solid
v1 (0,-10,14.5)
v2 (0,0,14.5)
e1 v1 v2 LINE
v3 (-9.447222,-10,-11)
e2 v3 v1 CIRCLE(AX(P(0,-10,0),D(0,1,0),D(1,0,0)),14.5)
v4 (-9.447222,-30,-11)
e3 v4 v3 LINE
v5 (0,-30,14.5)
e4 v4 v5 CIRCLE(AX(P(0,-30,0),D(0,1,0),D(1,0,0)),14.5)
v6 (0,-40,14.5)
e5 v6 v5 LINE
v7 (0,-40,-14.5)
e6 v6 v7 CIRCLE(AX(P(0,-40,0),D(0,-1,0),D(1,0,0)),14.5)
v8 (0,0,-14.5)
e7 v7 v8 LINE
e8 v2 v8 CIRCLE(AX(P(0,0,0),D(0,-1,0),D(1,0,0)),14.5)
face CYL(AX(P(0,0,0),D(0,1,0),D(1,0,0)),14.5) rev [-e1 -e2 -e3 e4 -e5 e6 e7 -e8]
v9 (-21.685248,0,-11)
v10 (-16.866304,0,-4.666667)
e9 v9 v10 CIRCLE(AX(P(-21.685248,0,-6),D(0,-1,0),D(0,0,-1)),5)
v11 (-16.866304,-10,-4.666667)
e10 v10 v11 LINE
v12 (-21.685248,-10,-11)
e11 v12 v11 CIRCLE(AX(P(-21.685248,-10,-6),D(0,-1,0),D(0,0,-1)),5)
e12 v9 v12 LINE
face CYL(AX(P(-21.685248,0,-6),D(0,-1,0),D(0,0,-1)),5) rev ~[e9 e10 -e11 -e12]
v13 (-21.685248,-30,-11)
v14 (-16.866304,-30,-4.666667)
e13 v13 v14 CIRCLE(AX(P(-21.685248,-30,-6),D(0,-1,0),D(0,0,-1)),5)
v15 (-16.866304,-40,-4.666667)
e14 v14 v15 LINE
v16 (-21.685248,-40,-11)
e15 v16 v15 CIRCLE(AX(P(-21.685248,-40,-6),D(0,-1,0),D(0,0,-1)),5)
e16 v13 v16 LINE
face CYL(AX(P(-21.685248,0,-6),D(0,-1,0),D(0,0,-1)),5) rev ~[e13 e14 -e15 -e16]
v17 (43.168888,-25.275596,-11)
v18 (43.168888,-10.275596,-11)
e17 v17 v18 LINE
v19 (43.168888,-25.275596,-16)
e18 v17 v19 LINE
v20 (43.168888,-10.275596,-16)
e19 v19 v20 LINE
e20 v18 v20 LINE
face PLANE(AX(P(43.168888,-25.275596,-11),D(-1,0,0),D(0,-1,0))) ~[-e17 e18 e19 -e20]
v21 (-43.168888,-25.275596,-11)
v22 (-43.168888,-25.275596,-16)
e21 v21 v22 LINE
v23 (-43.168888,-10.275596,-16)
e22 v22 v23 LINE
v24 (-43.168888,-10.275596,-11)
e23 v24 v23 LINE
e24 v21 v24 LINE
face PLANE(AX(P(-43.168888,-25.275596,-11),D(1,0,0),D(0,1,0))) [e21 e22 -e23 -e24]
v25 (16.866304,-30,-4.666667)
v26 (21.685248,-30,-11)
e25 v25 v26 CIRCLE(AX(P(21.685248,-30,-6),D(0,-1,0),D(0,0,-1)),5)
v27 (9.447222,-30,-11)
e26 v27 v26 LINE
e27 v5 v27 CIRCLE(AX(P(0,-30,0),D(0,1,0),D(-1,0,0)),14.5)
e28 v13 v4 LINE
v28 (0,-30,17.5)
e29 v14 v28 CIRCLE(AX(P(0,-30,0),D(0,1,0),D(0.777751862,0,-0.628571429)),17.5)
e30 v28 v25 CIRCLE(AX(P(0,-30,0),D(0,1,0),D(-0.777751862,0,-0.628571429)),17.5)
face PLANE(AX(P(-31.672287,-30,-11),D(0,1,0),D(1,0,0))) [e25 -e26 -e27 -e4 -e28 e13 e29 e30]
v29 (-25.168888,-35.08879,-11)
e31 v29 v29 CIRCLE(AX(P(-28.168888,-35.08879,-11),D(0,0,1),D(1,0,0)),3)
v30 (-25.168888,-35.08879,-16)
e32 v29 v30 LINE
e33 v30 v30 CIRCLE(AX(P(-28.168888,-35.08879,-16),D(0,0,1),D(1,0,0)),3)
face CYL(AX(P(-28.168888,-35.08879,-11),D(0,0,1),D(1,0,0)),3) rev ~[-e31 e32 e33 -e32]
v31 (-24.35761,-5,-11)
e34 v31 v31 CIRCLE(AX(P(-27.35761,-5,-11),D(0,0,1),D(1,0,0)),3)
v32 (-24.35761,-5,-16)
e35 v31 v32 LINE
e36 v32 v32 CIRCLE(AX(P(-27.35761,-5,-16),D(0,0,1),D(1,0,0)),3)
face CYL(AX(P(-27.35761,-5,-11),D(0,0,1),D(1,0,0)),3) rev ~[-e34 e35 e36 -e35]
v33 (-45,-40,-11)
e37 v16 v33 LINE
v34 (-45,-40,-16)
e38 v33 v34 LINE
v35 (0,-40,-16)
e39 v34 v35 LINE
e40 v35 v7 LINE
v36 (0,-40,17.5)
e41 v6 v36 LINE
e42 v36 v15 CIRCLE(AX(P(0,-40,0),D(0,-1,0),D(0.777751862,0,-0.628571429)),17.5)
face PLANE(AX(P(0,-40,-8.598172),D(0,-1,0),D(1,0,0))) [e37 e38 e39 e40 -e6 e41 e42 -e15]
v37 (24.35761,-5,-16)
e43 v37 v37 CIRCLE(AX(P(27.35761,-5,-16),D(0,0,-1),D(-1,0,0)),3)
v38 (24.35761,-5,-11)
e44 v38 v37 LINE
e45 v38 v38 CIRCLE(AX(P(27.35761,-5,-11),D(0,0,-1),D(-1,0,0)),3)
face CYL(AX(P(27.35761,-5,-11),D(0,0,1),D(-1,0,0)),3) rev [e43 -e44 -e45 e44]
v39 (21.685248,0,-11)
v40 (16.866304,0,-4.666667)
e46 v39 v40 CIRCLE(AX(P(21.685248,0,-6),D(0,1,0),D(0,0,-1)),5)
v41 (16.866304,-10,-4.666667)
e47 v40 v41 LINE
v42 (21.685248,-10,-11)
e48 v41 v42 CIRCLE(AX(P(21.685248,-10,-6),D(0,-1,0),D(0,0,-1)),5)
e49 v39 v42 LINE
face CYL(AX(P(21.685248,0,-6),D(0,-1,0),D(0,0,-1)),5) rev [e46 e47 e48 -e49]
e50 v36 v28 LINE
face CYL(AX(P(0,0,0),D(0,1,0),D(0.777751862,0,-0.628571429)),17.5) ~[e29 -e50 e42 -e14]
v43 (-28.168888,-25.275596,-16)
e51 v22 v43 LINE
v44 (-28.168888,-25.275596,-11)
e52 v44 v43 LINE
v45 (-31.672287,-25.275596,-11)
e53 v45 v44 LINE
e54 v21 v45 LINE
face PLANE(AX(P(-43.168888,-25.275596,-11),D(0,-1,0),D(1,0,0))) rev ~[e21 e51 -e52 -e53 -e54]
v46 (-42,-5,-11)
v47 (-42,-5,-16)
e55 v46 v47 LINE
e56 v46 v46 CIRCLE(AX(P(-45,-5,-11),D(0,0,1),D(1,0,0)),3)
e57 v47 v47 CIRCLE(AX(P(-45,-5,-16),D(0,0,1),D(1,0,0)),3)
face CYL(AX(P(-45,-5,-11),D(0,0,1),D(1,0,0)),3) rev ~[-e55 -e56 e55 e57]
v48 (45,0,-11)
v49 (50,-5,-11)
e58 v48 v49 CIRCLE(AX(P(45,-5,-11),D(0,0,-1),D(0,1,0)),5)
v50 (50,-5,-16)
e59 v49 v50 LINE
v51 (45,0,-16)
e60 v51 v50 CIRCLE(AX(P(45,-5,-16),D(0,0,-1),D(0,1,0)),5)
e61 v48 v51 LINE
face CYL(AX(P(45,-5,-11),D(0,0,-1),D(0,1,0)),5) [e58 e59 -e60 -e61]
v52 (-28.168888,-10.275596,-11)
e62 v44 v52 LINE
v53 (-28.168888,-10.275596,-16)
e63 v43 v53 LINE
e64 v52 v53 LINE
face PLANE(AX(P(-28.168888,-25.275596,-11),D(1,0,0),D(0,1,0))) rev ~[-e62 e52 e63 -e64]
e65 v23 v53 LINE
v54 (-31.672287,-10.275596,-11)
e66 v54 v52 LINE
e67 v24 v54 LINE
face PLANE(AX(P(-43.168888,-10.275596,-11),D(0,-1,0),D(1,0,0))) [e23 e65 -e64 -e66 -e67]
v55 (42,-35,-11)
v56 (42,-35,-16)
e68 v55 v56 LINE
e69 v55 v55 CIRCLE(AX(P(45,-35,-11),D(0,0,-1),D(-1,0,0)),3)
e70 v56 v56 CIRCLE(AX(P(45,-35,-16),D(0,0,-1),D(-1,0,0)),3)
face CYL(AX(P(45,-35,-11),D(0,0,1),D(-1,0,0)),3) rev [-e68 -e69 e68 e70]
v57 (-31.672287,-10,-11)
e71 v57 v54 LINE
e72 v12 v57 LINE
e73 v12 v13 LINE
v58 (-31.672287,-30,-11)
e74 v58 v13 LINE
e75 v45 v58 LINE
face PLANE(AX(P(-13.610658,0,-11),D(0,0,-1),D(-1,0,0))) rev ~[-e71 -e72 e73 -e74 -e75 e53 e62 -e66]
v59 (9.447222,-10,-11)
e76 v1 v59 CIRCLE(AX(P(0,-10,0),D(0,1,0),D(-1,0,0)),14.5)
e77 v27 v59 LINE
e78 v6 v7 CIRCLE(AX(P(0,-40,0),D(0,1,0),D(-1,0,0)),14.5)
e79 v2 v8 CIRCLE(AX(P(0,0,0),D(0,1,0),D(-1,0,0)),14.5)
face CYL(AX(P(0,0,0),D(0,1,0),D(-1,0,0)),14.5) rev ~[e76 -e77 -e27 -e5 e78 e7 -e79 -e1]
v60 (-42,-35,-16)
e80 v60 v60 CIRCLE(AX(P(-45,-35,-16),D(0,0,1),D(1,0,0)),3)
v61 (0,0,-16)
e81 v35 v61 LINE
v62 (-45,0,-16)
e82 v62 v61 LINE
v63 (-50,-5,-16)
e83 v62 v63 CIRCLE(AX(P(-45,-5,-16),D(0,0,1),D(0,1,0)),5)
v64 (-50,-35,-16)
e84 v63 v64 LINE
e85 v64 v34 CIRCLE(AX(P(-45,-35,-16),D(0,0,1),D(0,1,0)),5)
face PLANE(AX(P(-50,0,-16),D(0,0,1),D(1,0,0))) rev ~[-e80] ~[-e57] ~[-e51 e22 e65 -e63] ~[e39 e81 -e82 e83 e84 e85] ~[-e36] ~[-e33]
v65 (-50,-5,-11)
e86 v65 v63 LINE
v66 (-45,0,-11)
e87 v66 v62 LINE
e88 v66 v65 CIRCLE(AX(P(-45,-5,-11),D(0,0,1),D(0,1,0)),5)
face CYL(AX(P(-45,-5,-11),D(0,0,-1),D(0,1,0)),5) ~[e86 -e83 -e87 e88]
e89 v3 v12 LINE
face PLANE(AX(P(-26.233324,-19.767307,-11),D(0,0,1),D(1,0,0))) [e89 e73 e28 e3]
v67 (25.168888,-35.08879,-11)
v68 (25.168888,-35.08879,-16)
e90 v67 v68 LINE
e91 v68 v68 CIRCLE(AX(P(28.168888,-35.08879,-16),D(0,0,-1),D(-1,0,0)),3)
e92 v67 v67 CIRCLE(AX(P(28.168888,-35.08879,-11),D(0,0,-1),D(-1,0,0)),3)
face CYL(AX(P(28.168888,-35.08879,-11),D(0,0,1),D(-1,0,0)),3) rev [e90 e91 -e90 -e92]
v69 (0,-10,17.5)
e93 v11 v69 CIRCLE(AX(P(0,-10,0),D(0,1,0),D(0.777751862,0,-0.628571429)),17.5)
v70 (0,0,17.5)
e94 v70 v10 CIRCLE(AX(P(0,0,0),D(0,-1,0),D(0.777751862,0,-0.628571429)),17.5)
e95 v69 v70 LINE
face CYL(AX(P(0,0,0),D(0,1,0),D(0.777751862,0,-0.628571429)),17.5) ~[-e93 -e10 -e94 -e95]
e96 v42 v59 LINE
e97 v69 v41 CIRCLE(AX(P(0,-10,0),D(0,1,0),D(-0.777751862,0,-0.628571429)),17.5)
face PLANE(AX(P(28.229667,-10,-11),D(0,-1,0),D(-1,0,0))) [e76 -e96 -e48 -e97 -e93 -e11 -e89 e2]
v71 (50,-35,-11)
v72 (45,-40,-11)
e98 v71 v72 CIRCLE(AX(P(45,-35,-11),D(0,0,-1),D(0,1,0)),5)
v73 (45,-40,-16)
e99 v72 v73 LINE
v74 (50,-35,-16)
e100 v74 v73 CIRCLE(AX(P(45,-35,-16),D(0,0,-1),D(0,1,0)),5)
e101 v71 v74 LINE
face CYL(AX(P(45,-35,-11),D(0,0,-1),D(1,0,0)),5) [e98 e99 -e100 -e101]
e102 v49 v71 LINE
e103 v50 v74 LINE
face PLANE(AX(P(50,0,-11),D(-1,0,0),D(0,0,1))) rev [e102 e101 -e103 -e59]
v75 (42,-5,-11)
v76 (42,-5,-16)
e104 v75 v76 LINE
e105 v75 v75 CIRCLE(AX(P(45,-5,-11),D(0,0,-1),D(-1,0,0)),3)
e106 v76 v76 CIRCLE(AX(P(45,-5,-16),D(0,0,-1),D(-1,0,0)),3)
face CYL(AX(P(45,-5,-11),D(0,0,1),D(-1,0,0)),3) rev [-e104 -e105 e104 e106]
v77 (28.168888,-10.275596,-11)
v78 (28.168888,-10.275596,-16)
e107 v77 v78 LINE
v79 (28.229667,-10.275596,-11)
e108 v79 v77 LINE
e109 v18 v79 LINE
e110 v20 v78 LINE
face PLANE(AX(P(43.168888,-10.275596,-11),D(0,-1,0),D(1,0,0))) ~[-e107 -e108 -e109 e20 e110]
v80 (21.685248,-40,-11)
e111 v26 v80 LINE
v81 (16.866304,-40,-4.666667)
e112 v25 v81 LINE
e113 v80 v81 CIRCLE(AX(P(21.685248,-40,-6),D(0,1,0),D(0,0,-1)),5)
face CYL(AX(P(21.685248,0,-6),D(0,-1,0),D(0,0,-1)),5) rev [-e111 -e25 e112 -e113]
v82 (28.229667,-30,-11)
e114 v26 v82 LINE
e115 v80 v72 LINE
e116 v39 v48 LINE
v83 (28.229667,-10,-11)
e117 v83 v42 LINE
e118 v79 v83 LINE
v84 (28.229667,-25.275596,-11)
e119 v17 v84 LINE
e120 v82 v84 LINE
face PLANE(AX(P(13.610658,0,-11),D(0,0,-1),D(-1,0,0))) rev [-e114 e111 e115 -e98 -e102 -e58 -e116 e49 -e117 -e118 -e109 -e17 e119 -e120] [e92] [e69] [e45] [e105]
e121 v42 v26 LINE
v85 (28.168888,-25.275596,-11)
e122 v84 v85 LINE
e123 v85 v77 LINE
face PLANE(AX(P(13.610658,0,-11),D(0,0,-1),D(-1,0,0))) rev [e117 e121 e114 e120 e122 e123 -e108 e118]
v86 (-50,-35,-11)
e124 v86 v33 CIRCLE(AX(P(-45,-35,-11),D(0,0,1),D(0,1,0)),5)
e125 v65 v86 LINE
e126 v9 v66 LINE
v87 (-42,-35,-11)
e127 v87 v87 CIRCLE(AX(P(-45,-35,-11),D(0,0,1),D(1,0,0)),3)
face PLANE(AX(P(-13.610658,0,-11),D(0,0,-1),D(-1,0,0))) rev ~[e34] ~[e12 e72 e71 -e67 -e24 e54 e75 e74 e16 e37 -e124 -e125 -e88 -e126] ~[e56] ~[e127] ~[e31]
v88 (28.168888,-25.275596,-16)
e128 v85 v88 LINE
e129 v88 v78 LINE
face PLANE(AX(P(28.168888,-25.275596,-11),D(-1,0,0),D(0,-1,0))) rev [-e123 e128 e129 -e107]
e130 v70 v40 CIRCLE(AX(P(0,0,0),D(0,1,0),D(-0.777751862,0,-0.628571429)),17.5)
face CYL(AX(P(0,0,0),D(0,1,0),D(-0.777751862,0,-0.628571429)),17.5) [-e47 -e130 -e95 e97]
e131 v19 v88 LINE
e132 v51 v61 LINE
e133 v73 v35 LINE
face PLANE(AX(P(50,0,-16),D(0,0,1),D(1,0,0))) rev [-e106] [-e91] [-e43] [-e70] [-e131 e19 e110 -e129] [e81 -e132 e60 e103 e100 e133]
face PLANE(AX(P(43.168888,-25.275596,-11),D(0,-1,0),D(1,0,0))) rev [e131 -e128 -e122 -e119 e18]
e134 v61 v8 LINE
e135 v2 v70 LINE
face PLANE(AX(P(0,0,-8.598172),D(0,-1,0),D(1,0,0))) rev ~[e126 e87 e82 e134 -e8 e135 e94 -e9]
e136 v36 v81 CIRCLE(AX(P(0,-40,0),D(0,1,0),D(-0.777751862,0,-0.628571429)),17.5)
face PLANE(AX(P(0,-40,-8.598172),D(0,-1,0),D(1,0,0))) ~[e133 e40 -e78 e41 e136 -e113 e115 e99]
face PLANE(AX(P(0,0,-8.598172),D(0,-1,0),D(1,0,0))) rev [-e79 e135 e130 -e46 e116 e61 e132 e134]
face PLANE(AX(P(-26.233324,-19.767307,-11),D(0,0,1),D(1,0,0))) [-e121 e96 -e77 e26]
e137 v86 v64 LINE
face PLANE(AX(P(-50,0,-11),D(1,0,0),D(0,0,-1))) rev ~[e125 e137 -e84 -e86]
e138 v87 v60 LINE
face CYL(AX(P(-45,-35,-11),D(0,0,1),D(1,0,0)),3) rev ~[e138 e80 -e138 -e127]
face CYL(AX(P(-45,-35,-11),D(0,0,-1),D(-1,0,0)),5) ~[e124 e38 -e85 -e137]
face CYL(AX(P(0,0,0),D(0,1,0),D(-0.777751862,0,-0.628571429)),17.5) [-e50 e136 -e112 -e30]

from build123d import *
from build123d import SkipClean  # not in build123d's __all__

# Parameters (mm, degrees)
F0_R      = 14.5
F1_DEPTH  = 40
F2_R      = 5
F3_R      = 5
F4_W      = 15
F4_H      = 15
F4_R      = 3
F5_DEPTH  = 25
F6_W      = 110.2663613856
F6_H      = 71.1540803313
F7_DEPTH  = 50.001
F9_W      = 49.9149149903
F9_H      = 20
F10_DEPTH = 28.501


with BuildPart() as f1:
    # F0 (on Front) → F1 (new body)
    with BuildSketch(Plane.XZ):
        with BuildLine():
            Line((-13.6106575888, -11), (-50, -11))
            Line((-50, -11), (-50, -16))
            Line((-50, -16), (50, -16))
            Line((50, -16), (50, -11))
            Line((50, -11), (13.6106575888, -11))
            ThreePointArc((13.6106575888, -11), (0, 17.5), (-13.6106575888, -11))
        make_face()
        Circle(F0_R, mode=Mode.SUBTRACT)
    extrude(amount=F1_DEPTH)

    # F2
    f2_edges = [f1.edges().sort_by_distance(p)[0] for p in [
        (13.610658, -20, -11),
        (-13.610658, -20, -11),
    ]]
    fillet(f2_edges, radius=F2_R)

    # F3
    f3_edges = [f1.edges().sort_by_distance(p)[0] for p in [
        (50, -40, -13.5),
        (-50, -40, -13.5),
        (50, 0, -13.5),
        (-50, 0, -13.5),
    ]]
    fillet(f3_edges, radius=F3_R)

    # F4 (on face) → F5 (cut)
    with BuildSketch(Plane.XY.offset(-11)):
        with Locations((-35.6688876305, -17.775596238)):
            Rectangle(F4_W, F4_H)
        with Locations((-45, -35)):
            Circle(F4_R)
        with Locations((-28.1688876305, -35.0887903643)):
            Circle(F4_R)
        with Locations((-45, -5)):
            Circle(F4_R)
        with Locations((-27.3576099426, -5)):
            Circle(F4_R)
    extrude(amount=-F5_DEPTH, mode=Mode.SUBTRACT)

    # F6 (on Right) → F7 (cut, through all)
    with BuildSketch(Plane.YZ):
        with Locations((-21.3294159621, -6.3556879759)):
            Rectangle(F6_W, F6_H)
    extrude(amount=F7_DEPTH, mode=Mode.SUBTRACT)

    # F8: F1 across plane


with BuildPart() as f1_1:
    add(f1.part, clean=False)
    with SkipClean():  # cleaning this boolean's faces spoils the solid; the shape is the same uncleaned
        add(f1.part.mirror(Plane.YZ), clean=False)

    # F9 (on face) → F10 (cut, through all)
    with BuildSketch(Plane.XY.offset(-11)):
        Polygon((-21.6852484422, -10), (-31.6722874067, -10), (-31.6722874067, -10.275596238), (-28.1688876305, -10.275596238), (-28.1688876305, -25.275596238), (-31.6722874067, -25.275596238), (-31.6722874067, -30), (-21.6852484422, -30), align=None)
        with Locations((3.272209053, -20)):
            Rectangle(F9_W, F9_H)
    with SkipClean():  # cleaning this boolean's faces spoils the solid; the shape is the same uncleaned
        extrude(amount=F10_DEPTH, mode=Mode.SUBTRACT)


solid = f1_1.part
